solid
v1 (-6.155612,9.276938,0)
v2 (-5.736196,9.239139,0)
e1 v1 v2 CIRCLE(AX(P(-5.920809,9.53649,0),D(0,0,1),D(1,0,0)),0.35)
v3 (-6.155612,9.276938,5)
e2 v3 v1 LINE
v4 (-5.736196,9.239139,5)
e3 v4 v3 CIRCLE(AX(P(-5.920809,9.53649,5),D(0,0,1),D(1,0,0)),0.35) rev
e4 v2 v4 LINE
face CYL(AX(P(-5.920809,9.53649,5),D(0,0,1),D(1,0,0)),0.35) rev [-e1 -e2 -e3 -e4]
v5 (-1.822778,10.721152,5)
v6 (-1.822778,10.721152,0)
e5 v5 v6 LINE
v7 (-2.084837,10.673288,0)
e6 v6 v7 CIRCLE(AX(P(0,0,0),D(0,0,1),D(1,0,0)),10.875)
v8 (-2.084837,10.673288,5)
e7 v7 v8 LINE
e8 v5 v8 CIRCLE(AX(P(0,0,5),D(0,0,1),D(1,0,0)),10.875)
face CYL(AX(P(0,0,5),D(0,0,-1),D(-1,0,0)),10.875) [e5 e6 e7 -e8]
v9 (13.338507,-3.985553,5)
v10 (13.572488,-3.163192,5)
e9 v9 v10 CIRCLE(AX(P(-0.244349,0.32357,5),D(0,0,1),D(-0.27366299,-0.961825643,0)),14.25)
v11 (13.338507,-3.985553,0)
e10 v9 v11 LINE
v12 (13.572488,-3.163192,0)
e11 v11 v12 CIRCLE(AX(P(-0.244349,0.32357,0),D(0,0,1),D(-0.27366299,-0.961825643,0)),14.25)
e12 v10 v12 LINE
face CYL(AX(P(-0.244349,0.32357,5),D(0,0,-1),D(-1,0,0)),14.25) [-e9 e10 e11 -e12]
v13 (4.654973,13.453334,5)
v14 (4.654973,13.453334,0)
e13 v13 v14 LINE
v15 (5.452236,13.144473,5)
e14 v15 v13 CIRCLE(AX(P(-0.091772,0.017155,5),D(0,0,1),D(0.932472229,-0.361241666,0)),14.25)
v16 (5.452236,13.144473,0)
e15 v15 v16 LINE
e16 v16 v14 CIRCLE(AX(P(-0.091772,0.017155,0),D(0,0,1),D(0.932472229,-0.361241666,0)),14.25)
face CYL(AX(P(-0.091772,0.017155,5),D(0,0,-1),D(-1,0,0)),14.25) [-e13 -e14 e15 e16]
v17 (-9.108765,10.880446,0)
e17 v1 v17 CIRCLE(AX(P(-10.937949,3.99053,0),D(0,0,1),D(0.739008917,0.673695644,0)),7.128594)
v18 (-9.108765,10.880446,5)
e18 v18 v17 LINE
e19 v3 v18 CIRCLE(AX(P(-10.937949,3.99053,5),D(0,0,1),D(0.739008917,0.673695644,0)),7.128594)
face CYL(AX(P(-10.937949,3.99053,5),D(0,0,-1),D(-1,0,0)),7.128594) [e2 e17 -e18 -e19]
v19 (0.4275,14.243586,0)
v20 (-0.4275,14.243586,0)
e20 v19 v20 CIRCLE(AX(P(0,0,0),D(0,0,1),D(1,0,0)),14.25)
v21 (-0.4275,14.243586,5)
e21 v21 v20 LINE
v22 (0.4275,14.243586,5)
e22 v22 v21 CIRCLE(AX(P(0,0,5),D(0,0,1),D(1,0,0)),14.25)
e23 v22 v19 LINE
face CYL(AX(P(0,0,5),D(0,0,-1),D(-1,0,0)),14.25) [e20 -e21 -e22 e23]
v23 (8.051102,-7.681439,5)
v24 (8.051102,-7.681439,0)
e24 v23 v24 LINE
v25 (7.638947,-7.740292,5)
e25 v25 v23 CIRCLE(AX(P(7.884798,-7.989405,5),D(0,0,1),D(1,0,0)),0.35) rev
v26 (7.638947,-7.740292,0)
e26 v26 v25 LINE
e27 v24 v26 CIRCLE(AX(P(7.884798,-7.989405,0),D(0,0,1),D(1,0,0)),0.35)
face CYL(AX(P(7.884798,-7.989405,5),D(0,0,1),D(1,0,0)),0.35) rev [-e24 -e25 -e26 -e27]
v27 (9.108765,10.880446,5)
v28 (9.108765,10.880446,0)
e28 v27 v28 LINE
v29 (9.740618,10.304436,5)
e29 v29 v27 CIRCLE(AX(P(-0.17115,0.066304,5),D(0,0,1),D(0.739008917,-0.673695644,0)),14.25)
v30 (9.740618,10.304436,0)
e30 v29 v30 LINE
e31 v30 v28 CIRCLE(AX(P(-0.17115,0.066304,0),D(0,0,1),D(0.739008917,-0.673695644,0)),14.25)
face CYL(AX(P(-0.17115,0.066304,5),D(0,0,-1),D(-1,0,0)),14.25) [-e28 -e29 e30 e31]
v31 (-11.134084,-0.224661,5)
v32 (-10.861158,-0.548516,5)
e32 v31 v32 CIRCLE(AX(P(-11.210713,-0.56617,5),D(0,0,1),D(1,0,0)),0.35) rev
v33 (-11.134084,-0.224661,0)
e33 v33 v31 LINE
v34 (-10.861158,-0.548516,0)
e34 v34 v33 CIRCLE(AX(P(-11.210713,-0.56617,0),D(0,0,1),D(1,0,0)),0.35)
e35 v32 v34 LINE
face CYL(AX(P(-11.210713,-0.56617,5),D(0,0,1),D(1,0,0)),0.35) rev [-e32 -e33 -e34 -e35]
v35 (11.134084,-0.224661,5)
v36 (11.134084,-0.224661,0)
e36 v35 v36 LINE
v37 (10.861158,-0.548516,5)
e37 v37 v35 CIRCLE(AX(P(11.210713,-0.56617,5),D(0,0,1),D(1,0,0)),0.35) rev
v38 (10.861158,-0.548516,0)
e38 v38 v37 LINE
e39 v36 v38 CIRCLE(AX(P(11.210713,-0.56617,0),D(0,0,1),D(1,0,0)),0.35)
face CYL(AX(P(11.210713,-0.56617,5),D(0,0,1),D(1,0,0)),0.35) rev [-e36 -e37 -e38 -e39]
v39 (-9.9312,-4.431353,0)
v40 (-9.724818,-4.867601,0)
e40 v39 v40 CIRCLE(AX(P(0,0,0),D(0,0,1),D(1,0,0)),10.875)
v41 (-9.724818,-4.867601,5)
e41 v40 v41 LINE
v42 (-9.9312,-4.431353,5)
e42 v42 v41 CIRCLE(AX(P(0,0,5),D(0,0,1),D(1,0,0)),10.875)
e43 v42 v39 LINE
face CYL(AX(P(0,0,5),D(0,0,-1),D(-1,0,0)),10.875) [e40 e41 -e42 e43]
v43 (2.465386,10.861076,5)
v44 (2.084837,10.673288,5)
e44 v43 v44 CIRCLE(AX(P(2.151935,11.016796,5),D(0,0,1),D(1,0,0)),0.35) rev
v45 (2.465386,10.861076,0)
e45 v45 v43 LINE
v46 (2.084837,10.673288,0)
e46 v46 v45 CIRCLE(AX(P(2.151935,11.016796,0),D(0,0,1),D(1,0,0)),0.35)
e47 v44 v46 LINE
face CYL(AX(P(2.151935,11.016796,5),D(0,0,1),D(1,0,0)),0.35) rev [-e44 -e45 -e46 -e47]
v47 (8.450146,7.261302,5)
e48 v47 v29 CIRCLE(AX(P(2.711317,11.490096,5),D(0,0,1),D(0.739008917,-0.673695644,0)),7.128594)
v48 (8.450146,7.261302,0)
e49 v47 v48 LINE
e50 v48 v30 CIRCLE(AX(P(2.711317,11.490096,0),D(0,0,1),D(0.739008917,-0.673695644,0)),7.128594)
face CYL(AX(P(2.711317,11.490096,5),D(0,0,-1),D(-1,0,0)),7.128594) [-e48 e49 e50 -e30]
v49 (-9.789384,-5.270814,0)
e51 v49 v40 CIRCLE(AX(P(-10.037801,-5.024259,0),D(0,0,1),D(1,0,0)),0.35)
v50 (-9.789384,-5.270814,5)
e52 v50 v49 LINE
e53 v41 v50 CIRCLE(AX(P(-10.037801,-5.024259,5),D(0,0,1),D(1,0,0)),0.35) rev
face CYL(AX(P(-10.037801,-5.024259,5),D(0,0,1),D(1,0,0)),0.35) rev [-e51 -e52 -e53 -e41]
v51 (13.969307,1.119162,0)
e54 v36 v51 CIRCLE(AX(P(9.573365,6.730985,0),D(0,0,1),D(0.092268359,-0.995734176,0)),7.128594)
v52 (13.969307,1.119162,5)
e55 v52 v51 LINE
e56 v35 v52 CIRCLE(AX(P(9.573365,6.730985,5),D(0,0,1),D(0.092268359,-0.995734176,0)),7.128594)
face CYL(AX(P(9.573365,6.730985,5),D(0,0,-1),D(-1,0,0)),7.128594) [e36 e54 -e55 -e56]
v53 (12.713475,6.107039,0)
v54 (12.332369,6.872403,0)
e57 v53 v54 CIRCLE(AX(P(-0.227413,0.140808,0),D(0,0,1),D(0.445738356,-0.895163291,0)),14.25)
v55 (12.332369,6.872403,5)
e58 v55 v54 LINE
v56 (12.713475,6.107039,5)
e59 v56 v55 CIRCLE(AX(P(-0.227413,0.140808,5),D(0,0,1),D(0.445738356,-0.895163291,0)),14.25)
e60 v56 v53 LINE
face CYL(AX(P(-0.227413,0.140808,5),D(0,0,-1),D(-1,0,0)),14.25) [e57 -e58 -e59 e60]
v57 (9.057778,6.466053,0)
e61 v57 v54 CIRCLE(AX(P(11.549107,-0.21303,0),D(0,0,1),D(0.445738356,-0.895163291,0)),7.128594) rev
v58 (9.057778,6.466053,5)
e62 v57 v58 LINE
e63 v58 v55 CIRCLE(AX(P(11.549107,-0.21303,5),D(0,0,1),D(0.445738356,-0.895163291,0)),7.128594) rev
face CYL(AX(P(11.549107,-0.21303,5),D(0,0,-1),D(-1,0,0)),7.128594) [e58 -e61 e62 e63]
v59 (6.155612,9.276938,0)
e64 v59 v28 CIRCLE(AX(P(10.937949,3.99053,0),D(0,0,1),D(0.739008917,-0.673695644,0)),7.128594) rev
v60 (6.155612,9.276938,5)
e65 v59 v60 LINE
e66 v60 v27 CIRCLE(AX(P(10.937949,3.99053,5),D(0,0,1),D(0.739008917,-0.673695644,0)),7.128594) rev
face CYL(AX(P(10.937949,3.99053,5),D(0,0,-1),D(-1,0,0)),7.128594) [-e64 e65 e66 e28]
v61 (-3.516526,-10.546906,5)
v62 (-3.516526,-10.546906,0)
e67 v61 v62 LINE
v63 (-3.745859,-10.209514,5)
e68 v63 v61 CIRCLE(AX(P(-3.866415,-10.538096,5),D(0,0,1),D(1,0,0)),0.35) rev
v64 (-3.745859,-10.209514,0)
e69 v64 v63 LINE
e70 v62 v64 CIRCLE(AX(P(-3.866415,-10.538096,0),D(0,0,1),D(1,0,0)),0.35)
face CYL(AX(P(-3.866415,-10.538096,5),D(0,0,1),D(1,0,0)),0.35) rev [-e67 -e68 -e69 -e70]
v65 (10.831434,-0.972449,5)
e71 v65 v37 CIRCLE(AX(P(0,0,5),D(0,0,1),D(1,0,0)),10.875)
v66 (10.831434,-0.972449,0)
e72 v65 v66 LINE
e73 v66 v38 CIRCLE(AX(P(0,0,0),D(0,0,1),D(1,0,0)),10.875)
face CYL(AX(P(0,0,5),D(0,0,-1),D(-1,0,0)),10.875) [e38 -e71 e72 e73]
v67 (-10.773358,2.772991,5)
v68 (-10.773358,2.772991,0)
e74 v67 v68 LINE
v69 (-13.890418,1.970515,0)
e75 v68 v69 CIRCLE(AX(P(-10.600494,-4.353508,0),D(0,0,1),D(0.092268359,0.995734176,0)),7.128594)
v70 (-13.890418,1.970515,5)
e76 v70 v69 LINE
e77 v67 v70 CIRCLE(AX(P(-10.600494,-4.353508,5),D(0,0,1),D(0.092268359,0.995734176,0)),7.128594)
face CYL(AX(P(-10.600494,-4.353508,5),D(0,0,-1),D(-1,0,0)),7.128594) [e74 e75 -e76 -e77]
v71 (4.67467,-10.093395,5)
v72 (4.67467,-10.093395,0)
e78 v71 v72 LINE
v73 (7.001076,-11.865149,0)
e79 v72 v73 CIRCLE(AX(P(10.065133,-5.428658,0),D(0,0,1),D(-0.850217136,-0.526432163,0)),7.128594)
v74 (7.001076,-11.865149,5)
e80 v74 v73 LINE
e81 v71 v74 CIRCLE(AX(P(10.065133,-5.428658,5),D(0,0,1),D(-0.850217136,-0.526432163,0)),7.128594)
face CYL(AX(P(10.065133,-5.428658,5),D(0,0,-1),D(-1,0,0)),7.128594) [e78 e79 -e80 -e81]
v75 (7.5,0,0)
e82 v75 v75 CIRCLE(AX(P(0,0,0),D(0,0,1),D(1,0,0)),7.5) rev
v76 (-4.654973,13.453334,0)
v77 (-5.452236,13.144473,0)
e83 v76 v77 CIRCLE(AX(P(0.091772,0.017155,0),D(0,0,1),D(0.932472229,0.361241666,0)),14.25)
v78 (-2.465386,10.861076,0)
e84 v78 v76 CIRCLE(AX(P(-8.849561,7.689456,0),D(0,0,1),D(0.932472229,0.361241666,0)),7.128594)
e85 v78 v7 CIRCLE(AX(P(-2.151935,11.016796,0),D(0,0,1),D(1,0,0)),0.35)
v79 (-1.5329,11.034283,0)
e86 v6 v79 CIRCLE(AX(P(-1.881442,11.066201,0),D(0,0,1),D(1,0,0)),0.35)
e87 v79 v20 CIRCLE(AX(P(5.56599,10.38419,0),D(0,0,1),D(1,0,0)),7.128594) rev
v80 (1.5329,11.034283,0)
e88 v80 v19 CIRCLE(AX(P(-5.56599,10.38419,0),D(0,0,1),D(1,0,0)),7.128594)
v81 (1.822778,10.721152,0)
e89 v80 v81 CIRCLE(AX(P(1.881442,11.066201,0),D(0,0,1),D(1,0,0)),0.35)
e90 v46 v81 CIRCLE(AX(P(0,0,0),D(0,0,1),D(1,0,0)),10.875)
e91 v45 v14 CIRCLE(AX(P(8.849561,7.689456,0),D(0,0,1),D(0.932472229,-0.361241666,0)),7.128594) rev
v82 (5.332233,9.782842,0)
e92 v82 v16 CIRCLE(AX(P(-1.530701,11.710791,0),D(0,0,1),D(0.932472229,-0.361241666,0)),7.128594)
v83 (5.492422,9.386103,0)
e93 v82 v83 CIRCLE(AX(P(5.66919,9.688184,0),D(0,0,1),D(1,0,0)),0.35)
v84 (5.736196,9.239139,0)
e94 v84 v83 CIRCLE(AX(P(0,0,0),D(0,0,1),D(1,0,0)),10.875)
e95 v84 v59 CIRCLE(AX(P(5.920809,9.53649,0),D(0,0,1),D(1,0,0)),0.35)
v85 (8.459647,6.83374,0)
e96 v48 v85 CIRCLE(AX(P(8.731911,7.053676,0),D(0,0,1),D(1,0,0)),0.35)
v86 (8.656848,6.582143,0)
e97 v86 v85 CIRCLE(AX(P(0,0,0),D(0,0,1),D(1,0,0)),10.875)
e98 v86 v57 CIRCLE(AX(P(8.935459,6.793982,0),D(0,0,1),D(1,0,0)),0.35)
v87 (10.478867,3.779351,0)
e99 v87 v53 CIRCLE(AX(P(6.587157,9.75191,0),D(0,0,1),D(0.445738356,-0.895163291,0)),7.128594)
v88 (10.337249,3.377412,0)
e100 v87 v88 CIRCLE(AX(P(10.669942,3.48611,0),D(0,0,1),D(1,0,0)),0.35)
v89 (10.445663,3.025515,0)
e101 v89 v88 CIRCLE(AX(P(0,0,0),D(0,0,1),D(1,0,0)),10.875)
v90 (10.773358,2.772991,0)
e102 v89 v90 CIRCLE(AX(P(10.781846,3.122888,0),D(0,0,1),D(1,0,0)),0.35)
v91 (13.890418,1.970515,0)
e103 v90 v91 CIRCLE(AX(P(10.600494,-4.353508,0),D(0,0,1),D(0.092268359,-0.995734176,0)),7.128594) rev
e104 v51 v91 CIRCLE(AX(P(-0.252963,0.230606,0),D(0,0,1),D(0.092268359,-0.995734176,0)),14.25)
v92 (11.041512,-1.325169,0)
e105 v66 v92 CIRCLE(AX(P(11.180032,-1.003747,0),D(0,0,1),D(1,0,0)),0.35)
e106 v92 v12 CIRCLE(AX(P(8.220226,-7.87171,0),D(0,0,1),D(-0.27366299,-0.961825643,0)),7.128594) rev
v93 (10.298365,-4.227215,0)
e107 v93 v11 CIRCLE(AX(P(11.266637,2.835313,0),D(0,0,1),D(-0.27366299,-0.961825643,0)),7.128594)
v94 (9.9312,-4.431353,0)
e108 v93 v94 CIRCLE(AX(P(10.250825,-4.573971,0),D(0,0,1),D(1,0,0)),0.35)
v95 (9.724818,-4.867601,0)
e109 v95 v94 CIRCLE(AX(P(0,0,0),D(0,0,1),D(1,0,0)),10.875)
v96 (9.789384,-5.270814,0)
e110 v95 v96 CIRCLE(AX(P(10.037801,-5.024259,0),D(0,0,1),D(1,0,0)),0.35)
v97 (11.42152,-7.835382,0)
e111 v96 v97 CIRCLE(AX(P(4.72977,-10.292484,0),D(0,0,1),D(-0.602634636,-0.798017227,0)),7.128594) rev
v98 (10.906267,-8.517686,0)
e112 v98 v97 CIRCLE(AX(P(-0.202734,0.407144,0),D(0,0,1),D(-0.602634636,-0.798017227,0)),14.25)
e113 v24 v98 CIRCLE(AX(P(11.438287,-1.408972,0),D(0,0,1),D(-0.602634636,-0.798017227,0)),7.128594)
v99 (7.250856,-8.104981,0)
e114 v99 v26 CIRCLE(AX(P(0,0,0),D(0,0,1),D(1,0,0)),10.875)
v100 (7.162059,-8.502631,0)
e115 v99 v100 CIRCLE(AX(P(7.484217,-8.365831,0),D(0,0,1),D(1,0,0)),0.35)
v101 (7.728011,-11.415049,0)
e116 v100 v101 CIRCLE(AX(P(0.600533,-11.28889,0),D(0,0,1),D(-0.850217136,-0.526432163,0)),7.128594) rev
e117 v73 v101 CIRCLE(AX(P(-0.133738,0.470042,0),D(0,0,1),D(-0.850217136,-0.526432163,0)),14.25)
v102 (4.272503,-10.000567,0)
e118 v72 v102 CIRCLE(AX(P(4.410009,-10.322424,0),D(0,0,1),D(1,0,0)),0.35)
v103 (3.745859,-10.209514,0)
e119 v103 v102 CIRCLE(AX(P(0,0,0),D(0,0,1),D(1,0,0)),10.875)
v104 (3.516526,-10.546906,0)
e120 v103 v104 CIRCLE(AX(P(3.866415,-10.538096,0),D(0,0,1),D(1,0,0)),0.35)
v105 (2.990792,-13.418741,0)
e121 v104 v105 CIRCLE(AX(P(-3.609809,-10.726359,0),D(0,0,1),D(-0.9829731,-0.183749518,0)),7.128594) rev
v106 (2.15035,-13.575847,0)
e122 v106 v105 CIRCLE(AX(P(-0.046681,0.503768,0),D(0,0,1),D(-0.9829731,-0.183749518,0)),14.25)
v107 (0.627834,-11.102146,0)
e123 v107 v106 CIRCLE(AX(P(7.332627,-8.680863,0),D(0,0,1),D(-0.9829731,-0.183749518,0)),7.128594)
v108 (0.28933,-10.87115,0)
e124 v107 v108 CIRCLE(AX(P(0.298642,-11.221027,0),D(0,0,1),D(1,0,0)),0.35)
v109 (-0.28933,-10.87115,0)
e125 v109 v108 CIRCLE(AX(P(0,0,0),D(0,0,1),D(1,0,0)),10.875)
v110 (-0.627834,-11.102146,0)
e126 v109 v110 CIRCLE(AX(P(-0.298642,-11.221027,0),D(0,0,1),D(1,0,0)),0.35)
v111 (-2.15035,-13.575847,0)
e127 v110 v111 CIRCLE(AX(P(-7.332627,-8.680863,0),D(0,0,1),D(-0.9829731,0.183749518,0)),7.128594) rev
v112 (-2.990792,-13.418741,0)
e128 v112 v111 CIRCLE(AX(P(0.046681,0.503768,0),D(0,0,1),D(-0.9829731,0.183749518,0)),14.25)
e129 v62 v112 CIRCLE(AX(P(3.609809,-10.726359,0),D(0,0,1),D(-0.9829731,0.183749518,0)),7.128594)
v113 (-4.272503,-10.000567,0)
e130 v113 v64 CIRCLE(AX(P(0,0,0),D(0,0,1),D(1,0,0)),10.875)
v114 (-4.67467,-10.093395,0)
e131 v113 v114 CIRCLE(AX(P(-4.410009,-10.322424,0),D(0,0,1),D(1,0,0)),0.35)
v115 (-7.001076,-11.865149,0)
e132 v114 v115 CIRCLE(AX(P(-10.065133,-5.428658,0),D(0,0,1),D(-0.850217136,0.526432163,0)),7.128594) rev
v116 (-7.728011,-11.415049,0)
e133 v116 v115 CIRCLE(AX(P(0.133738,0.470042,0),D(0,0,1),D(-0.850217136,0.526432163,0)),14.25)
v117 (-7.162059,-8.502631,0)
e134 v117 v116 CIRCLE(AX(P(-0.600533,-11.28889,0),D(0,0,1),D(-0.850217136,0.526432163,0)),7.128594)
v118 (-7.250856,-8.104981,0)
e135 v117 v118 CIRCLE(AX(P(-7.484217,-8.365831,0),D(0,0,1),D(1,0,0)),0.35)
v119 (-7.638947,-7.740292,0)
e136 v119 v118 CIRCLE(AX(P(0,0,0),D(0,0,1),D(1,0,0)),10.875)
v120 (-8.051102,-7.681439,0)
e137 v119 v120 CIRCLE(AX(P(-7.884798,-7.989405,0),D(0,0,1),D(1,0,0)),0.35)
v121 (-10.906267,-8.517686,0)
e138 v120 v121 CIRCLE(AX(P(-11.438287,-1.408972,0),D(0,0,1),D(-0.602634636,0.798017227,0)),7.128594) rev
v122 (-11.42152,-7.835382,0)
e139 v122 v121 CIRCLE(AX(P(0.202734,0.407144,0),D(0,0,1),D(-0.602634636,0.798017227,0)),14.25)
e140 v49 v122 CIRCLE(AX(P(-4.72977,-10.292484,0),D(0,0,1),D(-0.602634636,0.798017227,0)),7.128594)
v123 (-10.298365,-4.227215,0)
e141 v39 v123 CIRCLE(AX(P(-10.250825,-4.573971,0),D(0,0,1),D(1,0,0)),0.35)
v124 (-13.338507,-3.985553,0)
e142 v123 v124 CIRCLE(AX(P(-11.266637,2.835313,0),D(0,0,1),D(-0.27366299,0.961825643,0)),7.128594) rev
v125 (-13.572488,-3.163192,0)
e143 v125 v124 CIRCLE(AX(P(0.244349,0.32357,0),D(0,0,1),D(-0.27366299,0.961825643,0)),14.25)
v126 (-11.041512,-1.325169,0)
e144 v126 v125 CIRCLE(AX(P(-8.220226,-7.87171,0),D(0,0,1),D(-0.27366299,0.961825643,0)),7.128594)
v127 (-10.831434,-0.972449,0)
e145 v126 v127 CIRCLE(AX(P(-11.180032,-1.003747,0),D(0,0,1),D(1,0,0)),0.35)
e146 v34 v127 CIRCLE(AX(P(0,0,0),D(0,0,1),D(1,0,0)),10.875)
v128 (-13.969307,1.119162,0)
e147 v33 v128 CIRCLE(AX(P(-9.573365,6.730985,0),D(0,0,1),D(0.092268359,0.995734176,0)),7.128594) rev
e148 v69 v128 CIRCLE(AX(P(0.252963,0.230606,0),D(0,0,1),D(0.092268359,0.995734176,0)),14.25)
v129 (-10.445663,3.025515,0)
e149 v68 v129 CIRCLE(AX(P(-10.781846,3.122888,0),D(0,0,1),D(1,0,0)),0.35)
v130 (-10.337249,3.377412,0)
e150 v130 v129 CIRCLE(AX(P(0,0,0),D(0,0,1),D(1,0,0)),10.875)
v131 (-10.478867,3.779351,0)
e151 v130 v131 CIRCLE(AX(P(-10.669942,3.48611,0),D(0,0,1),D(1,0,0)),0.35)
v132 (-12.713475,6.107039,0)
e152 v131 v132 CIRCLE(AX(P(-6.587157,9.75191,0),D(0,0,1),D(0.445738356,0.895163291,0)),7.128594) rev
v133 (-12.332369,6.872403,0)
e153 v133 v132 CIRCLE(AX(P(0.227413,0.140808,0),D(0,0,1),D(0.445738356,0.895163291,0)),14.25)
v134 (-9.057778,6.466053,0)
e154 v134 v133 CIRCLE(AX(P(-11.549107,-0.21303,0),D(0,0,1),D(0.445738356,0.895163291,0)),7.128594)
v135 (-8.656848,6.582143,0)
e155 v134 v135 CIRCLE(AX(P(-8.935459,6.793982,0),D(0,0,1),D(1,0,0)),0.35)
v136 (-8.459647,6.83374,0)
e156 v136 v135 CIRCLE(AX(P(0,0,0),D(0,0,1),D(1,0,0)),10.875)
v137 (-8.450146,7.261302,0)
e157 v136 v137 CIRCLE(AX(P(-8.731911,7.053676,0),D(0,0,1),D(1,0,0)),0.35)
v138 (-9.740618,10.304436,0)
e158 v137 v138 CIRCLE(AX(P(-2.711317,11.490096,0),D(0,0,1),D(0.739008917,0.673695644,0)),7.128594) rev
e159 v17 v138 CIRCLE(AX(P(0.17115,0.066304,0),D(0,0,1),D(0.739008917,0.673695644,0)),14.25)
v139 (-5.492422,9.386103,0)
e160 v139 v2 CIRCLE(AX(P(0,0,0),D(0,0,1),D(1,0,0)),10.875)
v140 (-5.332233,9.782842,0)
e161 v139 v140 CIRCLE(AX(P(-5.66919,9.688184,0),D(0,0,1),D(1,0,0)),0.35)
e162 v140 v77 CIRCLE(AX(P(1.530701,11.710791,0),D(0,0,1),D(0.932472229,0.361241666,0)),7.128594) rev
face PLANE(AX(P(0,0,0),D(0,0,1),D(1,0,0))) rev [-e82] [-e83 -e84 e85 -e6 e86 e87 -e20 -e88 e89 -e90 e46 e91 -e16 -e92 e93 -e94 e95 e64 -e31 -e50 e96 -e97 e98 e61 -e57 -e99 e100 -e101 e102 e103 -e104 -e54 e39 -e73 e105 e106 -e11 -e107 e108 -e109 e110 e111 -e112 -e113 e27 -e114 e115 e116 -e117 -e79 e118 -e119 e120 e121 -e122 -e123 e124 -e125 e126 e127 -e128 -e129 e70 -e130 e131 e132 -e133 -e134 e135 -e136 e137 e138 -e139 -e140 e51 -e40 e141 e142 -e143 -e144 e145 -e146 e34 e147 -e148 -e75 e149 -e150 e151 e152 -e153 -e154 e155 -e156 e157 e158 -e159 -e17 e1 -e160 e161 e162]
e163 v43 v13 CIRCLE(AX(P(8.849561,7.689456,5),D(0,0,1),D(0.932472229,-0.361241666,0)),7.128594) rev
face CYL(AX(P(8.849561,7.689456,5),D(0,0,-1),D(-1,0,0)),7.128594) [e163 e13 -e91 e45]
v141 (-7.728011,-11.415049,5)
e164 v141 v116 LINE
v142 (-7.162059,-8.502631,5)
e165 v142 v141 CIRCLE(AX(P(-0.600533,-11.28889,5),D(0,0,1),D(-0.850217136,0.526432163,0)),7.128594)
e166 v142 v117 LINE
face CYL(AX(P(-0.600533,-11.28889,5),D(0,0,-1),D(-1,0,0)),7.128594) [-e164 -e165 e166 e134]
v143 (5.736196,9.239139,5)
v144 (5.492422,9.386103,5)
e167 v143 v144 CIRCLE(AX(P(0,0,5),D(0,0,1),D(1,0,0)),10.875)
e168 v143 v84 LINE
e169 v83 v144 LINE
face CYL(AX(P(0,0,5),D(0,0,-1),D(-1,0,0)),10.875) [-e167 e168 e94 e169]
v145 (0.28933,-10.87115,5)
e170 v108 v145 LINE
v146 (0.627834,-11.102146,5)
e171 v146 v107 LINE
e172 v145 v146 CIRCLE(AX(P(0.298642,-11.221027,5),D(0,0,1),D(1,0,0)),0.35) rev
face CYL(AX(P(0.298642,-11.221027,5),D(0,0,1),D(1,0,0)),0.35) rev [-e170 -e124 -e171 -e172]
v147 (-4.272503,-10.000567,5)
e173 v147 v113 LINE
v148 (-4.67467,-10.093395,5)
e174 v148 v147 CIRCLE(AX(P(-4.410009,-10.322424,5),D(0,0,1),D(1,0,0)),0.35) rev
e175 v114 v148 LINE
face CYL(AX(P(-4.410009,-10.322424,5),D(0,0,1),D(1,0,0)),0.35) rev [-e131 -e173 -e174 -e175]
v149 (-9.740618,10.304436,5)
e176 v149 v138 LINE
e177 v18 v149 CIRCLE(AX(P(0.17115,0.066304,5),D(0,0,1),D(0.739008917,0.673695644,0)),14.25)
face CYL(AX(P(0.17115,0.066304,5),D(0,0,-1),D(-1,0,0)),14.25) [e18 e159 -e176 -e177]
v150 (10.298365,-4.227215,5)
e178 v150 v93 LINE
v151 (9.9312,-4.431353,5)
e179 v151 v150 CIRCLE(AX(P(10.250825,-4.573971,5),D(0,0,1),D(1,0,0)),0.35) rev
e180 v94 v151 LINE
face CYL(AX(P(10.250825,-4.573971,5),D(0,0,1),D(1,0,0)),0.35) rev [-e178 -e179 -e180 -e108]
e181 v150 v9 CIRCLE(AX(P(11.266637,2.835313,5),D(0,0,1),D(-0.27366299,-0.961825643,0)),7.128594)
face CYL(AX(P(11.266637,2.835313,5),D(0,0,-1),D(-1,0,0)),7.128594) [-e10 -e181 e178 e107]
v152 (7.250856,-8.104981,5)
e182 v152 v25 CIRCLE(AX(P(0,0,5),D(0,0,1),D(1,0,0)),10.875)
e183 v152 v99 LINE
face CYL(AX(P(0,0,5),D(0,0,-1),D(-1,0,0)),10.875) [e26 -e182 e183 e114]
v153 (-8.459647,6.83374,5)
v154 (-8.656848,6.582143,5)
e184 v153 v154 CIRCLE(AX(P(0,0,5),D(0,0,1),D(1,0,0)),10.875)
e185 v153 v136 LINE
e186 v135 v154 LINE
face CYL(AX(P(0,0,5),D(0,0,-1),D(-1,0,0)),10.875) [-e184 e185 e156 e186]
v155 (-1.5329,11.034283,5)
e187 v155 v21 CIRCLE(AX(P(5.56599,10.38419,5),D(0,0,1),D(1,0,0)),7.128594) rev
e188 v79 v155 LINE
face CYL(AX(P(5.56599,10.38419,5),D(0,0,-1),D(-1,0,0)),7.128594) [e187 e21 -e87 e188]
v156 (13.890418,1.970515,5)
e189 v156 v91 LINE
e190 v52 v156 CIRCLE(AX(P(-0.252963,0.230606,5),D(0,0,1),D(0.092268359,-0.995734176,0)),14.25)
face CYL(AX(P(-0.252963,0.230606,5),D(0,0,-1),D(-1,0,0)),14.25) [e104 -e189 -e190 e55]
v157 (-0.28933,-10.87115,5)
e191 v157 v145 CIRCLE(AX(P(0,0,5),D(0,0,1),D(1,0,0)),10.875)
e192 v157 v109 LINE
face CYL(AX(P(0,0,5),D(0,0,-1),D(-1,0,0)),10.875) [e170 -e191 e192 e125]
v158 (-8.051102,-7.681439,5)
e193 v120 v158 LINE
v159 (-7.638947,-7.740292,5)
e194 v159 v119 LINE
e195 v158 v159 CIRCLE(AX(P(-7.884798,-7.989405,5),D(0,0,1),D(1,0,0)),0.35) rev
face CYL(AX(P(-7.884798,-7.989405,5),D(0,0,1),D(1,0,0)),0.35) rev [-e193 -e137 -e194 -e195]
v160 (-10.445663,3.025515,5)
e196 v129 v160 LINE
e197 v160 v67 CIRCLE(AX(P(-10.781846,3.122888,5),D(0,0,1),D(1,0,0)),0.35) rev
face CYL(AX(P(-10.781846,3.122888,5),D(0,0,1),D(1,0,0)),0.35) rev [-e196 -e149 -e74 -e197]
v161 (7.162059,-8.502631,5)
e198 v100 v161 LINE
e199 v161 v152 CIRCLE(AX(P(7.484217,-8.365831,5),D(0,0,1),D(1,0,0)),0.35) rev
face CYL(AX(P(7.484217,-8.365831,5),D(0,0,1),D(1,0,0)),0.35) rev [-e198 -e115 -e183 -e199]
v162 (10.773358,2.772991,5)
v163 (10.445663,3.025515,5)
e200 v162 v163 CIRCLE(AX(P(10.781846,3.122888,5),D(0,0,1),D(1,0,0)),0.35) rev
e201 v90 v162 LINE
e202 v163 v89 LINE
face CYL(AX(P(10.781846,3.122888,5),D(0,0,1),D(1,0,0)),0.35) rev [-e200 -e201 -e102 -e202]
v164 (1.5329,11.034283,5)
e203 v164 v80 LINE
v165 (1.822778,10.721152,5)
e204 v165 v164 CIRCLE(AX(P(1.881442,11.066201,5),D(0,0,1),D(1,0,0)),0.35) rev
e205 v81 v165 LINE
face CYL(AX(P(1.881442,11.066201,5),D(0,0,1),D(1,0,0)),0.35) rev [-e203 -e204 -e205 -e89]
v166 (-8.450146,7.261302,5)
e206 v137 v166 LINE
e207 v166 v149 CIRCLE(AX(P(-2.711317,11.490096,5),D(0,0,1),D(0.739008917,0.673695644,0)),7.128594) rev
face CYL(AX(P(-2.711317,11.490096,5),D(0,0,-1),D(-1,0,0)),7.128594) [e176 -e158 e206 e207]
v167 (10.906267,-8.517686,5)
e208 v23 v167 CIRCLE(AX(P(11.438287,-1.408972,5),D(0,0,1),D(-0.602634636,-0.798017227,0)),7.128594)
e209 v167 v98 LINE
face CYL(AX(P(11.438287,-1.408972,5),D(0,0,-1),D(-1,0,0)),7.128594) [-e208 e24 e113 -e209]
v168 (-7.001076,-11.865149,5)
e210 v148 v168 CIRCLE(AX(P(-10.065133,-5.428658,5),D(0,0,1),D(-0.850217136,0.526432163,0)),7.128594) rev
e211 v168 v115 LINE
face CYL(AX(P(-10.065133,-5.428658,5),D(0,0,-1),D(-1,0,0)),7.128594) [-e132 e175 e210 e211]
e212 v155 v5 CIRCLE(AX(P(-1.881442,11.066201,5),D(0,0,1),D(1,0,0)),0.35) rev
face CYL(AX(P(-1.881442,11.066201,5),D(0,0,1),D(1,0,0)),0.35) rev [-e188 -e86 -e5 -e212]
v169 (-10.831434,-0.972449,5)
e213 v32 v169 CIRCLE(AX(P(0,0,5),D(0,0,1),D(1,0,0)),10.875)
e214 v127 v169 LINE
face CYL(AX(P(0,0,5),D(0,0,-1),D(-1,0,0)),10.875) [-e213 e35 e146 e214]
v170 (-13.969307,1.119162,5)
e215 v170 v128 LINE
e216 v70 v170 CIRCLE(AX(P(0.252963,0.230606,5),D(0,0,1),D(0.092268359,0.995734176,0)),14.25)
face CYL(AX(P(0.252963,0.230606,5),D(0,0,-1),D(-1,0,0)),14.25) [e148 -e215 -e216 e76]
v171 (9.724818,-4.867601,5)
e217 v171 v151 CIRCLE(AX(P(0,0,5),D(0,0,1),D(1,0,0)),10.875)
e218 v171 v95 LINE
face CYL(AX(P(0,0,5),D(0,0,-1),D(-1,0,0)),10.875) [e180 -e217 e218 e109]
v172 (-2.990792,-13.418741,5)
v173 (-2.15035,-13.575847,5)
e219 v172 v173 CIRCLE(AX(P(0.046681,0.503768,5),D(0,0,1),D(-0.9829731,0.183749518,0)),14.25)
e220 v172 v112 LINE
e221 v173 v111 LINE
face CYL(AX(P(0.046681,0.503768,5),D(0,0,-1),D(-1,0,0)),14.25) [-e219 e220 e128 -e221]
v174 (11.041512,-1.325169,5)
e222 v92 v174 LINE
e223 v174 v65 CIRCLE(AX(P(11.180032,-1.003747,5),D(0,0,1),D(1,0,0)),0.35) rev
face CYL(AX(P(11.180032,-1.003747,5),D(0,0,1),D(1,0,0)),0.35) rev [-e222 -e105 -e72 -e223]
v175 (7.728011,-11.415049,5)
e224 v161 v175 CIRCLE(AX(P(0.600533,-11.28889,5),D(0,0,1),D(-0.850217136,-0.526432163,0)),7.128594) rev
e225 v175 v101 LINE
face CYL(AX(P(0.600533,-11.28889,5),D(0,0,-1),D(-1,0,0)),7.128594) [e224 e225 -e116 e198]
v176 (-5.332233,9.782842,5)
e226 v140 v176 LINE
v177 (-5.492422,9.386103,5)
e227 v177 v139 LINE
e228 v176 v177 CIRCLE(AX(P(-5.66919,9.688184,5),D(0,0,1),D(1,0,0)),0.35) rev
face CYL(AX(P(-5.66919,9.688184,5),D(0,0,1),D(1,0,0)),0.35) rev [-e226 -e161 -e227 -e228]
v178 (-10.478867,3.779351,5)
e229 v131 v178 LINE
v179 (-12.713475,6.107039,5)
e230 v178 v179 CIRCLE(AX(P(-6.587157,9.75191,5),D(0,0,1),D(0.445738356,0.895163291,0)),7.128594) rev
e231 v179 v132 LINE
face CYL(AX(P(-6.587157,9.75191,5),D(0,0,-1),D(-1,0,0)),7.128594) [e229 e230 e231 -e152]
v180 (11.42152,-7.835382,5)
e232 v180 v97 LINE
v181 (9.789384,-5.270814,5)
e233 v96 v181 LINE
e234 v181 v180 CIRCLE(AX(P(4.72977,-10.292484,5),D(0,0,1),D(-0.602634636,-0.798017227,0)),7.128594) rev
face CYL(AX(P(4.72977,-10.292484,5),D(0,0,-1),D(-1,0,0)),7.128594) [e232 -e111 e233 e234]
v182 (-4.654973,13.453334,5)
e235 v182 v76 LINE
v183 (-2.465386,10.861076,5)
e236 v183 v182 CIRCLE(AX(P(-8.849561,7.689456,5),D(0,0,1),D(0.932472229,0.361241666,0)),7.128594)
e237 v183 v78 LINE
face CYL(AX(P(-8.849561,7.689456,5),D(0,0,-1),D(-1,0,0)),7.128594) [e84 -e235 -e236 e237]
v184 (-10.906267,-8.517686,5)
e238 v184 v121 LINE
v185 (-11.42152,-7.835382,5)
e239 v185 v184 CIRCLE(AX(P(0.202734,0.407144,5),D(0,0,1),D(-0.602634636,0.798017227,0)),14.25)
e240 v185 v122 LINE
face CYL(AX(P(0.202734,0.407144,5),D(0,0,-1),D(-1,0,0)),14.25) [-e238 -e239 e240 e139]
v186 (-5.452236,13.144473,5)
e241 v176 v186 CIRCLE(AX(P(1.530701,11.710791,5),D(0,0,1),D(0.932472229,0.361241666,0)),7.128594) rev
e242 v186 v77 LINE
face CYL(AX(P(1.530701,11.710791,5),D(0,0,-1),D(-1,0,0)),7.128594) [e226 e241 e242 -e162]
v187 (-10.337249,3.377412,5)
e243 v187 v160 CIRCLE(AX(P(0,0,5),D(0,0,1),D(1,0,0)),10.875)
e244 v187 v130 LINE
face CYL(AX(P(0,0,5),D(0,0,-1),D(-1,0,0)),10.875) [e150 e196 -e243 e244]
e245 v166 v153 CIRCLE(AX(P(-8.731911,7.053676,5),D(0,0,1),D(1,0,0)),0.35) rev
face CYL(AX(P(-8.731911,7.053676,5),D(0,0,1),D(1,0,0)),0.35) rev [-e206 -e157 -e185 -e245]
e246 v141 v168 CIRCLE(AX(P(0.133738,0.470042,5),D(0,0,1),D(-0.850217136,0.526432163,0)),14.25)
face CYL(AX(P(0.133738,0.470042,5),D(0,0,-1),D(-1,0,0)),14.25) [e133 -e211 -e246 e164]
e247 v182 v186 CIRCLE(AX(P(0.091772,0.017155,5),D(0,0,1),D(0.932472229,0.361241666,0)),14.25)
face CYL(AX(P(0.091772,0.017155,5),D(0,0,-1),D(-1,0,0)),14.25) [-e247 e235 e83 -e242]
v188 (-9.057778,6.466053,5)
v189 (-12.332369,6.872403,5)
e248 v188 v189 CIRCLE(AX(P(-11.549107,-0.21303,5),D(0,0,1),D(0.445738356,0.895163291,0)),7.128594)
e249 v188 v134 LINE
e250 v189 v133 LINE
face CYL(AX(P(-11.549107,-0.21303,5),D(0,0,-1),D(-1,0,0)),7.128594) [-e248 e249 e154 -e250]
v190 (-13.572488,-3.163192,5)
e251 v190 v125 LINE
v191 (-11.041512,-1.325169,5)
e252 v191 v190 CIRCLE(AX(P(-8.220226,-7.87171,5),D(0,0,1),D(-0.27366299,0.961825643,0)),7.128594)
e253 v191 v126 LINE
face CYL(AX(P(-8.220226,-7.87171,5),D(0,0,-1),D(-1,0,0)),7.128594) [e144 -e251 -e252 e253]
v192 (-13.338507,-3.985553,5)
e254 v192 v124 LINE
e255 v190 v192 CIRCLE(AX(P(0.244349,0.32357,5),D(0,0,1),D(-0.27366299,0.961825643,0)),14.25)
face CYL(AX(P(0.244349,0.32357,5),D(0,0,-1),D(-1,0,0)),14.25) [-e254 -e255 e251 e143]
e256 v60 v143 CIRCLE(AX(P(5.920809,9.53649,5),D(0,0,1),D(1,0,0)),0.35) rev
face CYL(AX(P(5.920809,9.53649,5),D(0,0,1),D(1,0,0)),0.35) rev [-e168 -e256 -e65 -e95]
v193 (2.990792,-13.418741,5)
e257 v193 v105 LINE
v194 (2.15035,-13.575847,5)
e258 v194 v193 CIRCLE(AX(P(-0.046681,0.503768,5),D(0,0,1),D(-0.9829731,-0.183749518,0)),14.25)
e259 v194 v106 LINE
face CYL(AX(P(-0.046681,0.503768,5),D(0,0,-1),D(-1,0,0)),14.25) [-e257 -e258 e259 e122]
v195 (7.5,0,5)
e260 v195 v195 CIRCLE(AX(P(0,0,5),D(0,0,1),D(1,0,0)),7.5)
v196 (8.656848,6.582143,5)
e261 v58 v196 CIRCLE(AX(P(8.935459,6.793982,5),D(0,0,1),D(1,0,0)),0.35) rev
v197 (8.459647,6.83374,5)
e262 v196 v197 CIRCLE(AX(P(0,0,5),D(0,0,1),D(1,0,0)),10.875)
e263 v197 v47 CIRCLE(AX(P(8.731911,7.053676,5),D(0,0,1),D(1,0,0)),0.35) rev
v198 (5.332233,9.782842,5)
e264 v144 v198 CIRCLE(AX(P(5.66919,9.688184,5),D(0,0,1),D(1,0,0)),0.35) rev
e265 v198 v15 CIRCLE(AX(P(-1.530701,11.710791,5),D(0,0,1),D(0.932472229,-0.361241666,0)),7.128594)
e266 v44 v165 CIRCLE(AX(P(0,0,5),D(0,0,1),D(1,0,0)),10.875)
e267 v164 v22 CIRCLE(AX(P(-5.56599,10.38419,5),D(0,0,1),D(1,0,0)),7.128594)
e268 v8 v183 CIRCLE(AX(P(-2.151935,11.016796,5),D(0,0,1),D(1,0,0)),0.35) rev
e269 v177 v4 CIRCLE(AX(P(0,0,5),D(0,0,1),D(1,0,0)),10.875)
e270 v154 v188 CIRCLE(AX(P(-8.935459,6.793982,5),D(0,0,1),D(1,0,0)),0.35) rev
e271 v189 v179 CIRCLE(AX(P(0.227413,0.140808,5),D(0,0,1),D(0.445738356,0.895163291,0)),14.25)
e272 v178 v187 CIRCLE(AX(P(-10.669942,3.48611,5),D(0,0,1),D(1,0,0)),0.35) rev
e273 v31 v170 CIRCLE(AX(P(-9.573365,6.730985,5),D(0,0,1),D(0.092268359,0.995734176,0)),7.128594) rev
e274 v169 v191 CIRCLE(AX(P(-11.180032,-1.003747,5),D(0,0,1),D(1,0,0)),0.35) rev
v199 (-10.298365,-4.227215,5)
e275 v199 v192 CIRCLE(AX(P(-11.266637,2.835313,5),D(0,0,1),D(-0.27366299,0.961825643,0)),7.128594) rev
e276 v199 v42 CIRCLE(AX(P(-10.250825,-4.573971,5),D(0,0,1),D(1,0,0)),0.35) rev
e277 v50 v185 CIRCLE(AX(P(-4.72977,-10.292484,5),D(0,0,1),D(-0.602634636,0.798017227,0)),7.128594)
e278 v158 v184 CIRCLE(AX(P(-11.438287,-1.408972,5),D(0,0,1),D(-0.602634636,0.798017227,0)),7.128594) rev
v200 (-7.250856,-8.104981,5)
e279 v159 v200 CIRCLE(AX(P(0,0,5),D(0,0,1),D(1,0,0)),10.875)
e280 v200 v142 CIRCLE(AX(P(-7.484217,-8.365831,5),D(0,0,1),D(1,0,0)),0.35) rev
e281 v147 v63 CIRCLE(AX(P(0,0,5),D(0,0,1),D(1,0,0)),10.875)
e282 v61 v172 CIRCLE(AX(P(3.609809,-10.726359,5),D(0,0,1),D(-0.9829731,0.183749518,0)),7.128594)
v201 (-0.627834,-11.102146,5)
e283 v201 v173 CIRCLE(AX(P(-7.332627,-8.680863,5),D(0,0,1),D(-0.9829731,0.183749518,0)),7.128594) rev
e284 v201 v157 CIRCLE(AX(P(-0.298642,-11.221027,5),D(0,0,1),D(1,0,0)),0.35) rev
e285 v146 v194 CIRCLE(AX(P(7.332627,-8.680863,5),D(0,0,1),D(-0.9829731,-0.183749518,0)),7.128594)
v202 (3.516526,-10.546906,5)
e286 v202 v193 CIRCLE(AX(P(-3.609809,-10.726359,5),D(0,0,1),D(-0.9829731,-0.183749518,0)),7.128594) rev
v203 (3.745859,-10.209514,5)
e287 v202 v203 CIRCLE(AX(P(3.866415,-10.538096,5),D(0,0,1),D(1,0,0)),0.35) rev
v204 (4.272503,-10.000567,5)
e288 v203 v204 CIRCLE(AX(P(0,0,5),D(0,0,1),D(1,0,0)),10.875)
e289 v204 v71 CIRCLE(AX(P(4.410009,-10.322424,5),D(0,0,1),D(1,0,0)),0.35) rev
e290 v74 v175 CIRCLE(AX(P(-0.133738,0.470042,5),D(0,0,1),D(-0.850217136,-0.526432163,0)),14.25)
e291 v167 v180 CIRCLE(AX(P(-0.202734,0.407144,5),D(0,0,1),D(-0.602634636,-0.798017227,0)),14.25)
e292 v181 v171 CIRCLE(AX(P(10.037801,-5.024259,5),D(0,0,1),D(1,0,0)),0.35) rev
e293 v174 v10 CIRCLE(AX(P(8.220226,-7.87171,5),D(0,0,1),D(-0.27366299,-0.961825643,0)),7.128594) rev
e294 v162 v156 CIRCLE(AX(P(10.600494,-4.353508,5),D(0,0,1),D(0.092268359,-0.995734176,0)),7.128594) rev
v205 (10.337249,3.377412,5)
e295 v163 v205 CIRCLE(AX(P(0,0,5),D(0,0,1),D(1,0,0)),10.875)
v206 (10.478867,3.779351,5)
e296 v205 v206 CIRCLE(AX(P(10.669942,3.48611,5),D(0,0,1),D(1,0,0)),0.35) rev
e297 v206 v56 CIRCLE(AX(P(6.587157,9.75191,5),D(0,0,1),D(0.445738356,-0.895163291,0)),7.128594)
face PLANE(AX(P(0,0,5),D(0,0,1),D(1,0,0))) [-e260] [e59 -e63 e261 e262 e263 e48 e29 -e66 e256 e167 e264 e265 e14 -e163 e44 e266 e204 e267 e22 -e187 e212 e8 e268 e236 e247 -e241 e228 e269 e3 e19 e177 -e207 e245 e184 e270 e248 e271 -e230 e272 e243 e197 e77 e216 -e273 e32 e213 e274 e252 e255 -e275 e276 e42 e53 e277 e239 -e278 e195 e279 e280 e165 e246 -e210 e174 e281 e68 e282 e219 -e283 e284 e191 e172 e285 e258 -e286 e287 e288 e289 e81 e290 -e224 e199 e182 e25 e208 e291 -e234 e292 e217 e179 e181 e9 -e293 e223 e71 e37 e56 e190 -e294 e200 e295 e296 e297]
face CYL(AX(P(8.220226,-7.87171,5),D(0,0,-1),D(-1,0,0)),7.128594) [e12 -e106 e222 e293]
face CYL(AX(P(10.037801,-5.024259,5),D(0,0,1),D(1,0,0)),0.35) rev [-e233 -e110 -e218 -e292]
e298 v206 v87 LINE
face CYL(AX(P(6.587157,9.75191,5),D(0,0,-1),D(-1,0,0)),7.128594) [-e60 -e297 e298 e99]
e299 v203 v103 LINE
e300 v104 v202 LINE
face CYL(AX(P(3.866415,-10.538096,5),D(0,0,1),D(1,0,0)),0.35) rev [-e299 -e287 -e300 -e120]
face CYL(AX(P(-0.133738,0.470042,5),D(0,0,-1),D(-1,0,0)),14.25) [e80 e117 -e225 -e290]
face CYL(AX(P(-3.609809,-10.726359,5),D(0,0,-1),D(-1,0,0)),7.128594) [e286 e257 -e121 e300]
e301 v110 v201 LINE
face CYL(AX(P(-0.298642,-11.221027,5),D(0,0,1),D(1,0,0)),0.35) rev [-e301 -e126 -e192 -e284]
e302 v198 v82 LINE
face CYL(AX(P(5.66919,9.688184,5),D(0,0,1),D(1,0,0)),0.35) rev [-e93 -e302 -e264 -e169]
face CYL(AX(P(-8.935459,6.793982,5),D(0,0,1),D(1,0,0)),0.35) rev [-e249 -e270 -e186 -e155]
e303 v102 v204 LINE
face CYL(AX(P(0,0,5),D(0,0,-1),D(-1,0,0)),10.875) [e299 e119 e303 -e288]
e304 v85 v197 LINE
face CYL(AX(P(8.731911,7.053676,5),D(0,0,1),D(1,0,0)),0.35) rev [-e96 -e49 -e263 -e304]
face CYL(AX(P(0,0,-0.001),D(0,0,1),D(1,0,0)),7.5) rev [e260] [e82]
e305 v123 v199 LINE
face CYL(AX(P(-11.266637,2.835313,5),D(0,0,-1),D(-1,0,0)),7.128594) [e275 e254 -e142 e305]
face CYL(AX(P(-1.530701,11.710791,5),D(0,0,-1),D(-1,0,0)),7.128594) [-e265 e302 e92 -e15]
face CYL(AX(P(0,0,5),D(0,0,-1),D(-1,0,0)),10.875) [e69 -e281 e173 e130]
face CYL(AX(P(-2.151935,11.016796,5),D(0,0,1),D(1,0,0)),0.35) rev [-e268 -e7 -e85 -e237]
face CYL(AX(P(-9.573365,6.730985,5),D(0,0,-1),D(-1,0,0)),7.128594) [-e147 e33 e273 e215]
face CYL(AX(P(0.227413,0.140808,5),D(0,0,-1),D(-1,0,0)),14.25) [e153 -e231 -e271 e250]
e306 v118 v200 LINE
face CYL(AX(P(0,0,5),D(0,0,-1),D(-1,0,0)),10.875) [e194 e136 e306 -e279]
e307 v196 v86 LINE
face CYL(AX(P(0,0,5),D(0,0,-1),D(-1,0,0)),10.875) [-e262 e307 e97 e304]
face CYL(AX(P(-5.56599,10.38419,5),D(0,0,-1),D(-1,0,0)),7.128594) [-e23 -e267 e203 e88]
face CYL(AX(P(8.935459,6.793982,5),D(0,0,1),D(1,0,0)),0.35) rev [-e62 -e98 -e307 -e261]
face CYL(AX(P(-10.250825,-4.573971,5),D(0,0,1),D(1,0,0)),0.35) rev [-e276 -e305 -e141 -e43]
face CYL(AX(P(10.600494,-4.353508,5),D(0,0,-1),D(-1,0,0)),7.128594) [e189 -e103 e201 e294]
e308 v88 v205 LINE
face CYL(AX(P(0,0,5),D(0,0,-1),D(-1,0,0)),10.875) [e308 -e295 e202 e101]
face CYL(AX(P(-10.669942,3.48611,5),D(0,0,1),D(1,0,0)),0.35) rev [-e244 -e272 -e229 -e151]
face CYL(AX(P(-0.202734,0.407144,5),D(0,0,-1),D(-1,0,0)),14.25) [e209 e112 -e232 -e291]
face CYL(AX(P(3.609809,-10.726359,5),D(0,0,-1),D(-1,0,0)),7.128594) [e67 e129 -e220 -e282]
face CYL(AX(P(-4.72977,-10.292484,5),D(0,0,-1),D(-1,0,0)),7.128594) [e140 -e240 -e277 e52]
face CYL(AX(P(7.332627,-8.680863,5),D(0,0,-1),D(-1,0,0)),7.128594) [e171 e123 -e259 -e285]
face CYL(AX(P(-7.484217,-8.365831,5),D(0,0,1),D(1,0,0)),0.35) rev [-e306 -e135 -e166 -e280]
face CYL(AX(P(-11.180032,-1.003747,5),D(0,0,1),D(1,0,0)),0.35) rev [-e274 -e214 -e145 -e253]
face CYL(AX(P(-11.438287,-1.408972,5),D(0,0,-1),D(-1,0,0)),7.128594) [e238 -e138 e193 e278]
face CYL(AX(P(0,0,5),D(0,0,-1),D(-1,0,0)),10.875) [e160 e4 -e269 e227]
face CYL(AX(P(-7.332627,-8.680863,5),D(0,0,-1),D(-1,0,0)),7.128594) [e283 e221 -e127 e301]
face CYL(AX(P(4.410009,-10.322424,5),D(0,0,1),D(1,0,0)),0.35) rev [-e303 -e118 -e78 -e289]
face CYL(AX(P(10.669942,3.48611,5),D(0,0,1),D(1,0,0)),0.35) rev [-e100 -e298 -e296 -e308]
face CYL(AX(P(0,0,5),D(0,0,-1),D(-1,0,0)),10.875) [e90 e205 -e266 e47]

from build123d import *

# Parameters (mm, degrees)
SKETCH_1_R               = 10.875
EXTRUDE_1_DEPTH          = 5
EXTRUDE_2_DEPTH          = 5
FILLET_1_R               = 0.35
PATTERN_CIRCULAR_1_DEPTH = 5
CUT_EXTRUDE_1_REACH      = 22.572
SKETCH_2_R               = 7.5


# Read off the part's stored shape, not the designer's step: 원형 패턴1
with BuildPart() as part:
    # 스케치1 → 보스-돌출1 (new body)
    with BuildSketch(Plane.XY):
        Circle(SKETCH_1_R)
    extrude(amount=EXTRUDE_1_DEPTH)

    # 스케치1<3> → 보스-돌출2 (add)
    with BuildSketch(Plane.XY):
        with BuildLine():
            ThreePointArc((1.5525, 10.763613183), (1.216970842, 12.576974386), (0.4275, 14.243586057))
            ThreePointArc((0.4275, 14.243586057), (0, 14.25), (-0.4275, 14.243586057))
            ThreePointArc((-0.4275, 14.243586057), (-1.216970842, 12.576974386), (-1.5525, 10.763613183))
            ThreePointArc((-1.5525, 10.763613183), (0, 10.875), (1.5525, 10.763613183))
        make_face()
    extrude(amount=EXTRUDE_2_DEPTH)

    # 필렛1
    fillet_1_edges = [part.edges().sort_by_distance(p)[0] for p in [
        (-1.5525, 10.763613183, 2.5),
        (1.5525, 10.763613183, 2.5),
    ]]
    fillet(fillet_1_edges, radius=FILLET_1_R)

    # 원형 패턴1 outline → 원형 패턴1 (add)
    with BuildSketch(Plane.XY):
        with BuildLine():
            ThreePointArc((2.084837088, 10.673288121), (3.842906104, 10.173381821), (5.492422476, 9.386102511))
            ThreePointArc((5.492422476, 9.386102511), (5.344646109, 9.557145045), (5.332233471, 9.782842475))
            ThreePointArc((5.332233471, 9.782842475), (5.593355494, 11.4564781), (5.452236305, 13.144472855))
            ThreePointArc((5.452236305, 13.144472855), (5.055921411, 13.304884491), (4.654972549, 13.453334479))
            ThreePointArc((4.654972549, 13.453334479), (3.403689946, 12.289385973), (2.465385752, 10.861075951))
            ThreePointArc((2.465385752, 10.861075951), (2.306817266, 10.702930709), (2.084837088, 10.673288121))
        make_face()
        with BuildLine():
            ThreePointArc((5.736195698, 9.2391387), (7.199095251, 8.150990895), (8.459646862, 6.833739823))
            ThreePointArc((8.459646862, 6.833739823), (8.381997736, 7.045900933), (8.450146114, 7.261301773))
            ThreePointArc((8.450146114, 7.261301773), (9.274201483, 8.707038787), (9.740617886, 10.304436202))
            ThreePointArc((9.740617886, 10.304436202), (9.42901262, 10.597181051), (9.108765262, 10.880445977))
            ThreePointArc((9.108765262, 10.880445977), (7.536352291, 10.255192371), (6.155612256, 9.27693802))
            ThreePointArc((6.155612256, 9.27693802), (5.952224819, 9.187903085), (5.736195698, 9.2391387))
        make_face()
        with BuildLine():
            ThreePointArc((8.656847778, 6.582143386), (9.631277253, 5.050160738), (10.337248772, 3.377412148))
            ThreePointArc((10.337248772, 3.377412148), (10.339832595, 3.602419922), (10.478866532, 3.779351375))
            ThreePointArc((10.478866532, 3.779351375), (11.729603042, 4.815098477), (12.713475046, 6.107038785))
            ThreePointArc((12.713475046, 6.107038785), (12.528663426, 6.492580033), (12.332368752, 6.872403399))
            ThreePointArc((12.332368752, 6.872403399), (10.671238348, 6.86130469), (9.057778331, 6.466052652))
            ThreePointArc((9.057778331, 6.466052652), (8.838113972, 6.457792134), (8.656847778, 6.582143386))
        make_face()
        with BuildLine():
            ThreePointArc((10.44566348, 3.025514743), (10.802249116, 1.255802147), (10.861158072, -0.548516485))
            ThreePointArc((10.861158072, -0.548516485), (10.943077602, -0.34062274), (11.134084318, -0.224661311))
            ThreePointArc((11.134084318, -0.224661311), (12.626546762, 0.289328326), (13.969306954, 1.119162384))
            ThreePointArc((13.969306954, 1.119162384), (13.936248813, 1.545430549), (13.890417506, 1.970515105))
            ThreePointArc((13.890417506, 1.970515105), (12.377771936, 2.549980076), (10.773358461, 2.772990553))
            ThreePointArc((10.773358461, 2.772990553), (10.568207288, 2.845653785), (10.44566348, 3.025514743))
        make_face()
        with BuildLine():
            ThreePointArc((10.831434222, -0.972449329), (10.524388312, -2.739137757), (9.931200049, -4.431353133))
            ThreePointArc((9.931200049, -4.431353133), (10.080749628, -4.26807205), (10.298365111, -4.227215102))
            ThreePointArc((10.298365111, -4.227215102), (11.831510548, -4.270865326), (13.338506551, -3.985552654))
            ThreePointArc((13.338506551, -3.985552654), (13.461666574, -3.57612745), (13.572488407, -3.163191729))
            ThreePointArc((13.572488407, -3.163191729), (12.409057254, -2.103647039), (11.041512467, -1.325168872))
            ThreePointArc((11.041512467, -1.325168872), (10.879326869, -1.182845296), (10.831434222, -0.972449329))
        make_face()
        with BuildLine():
            ThreePointArc((9.724818044, -4.867600951), (8.799895988, -6.389636578), (7.638946645, -7.74029193))
            ThreePointArc((7.638946645, -7.74029193), (7.835322049, -7.642919348), (8.051101932, -7.68143897))
            ThreePointArc((8.051101932, -7.68143897), (9.434573038, -8.250170344), (10.906266927, -8.517686277))
            ThreePointArc((10.906266927, -8.517686277), (11.169011671, -8.180399177), (11.421519541, -7.835381548))
            ThreePointArc((11.421519541, -7.835381548), (10.743744256, -6.465085659), (9.78938361, -5.27081353))
            ThreePointArc((9.78938361, -5.27081353), (9.692203368, -5.079599132), (9.724818044, -4.867600951))
        make_face()
        with BuildLine():
            ThreePointArc((7.250855805, -8.104980882), (5.839114845, -9.174440736), (4.272503154, -10.000567074))
            ThreePointArc((4.272503154, -10.000567074), (4.488726043, -9.981391229), (4.674670149, -10.09339498))
            ThreePointArc((4.674670149, -10.09339498), (5.746046713, -11.099844355), (7.00107552, -11.865148727))
            ThreePointArc((7.00107552, -11.865148727), (7.367919852, -11.645552222), (7.728011172, -11.415049228))
            ThreePointArc((7.728011172, -11.415049228), (7.598229184, -9.929070664), (7.162058655, -8.502630716))
            ThreePointArc((7.162058655, -8.502630716), (7.142629708, -8.289552802), (7.250855805, -8.104980882))
        make_face()
        with BuildLine():
            ThreePointArc((3.745858716, -10.209513577), (2.04453627, -10.681081239), (0.289330355, -10.871150489))
            ThreePointArc((0.289330355, -10.871150489), (0.495925275, -10.93192564), (0.627834307, -11.102146342))
            ThreePointArc((0.627834307, -11.102146342), (1.261761796, -12.417365945), (2.150350071, -13.57584665))
            ThreePointArc((2.150350071, -13.57584665), (2.57174963, -13.503598465), (2.990792071, -13.418740812))
            ThreePointArc((2.990792071, -13.418740812), (3.40225572, -12.010026536), (3.516526006, -10.546906395))
            ThreePointArc((3.516526006, -10.546906395), (3.576953157, -10.341342504), (3.745858716, -10.209513577))
        make_face()
        with BuildLine():
            ThreePointArc((-0.289330355, -10.871150489), (-2.04453627, -10.681081239), (-3.745858716, -10.209513577))
            ThreePointArc((-3.745858716, -10.209513577), (-3.576953157, -10.341342504), (-3.516526006, -10.546906395))
            ThreePointArc((-3.516526006, -10.546906395), (-3.40225572, -12.010026536), (-2.990792071, -13.418740812))
            ThreePointArc((-2.990792071, -13.418740812), (-2.57174963, -13.503598465), (-2.150350071, -13.57584665))
            ThreePointArc((-2.150350071, -13.57584665), (-1.261761796, -12.417365945), (-0.627834307, -11.102146342))
            ThreePointArc((-0.627834307, -11.102146342), (-0.495925275, -10.93192564), (-0.289330355, -10.871150489))
        make_face()
        with BuildLine():
            ThreePointArc((-4.272503154, -10.000567074), (-5.839114845, -9.174440736), (-7.250855805, -8.104980882))
            ThreePointArc((-7.250855805, -8.104980882), (-7.142629708, -8.289552802), (-7.162058655, -8.502630716))
            ThreePointArc((-7.162058655, -8.502630716), (-7.598229184, -9.929070664), (-7.728011172, -11.415049228))
            ThreePointArc((-7.728011172, -11.415049228), (-7.367919852, -11.645552222), (-7.00107552, -11.865148727))
            ThreePointArc((-7.00107552, -11.865148727), (-5.746046713, -11.099844355), (-4.674670149, -10.09339498))
            ThreePointArc((-4.674670149, -10.09339498), (-4.488726043, -9.981391229), (-4.272503154, -10.000567074))
        make_face()
        with BuildLine():
            ThreePointArc((-7.638946645, -7.74029193), (-8.799895988, -6.389636578), (-9.724818044, -4.867600951))
            ThreePointArc((-9.724818044, -4.867600951), (-9.692203368, -5.079599132), (-9.78938361, -5.27081353))
            ThreePointArc((-9.78938361, -5.27081353), (-10.743744256, -6.465085659), (-11.421519541, -7.835381548))
            ThreePointArc((-11.421519541, -7.835381548), (-11.169011671, -8.180399177), (-10.906266927, -8.517686277))
            ThreePointArc((-10.906266927, -8.517686277), (-9.434573038, -8.250170344), (-8.051101932, -7.68143897))
            ThreePointArc((-8.051101932, -7.68143897), (-7.835322049, -7.642919348), (-7.638946645, -7.74029193))
        make_face()
        with BuildLine():
            ThreePointArc((-9.931200049, -4.431353133), (-10.524388312, -2.739137757), (-10.831434222, -0.972449329))
            ThreePointArc((-10.831434222, -0.972449329), (-10.879326869, -1.182845296), (-11.041512467, -1.325168872))
            ThreePointArc((-11.041512467, -1.325168872), (-12.409057254, -2.103647039), (-13.572488407, -3.163191729))
            ThreePointArc((-13.572488407, -3.163191729), (-13.461666574, -3.57612745), (-13.338506551, -3.985552654))
            ThreePointArc((-13.338506551, -3.985552654), (-11.831510548, -4.270865326), (-10.298365111, -4.227215102))
            ThreePointArc((-10.298365111, -4.227215102), (-10.080749628, -4.26807205), (-9.931200049, -4.431353133))
        make_face()
        with BuildLine():
            ThreePointArc((-10.861158072, -0.548516485), (-10.802249116, 1.255802147), (-10.44566348, 3.025514743))
            ThreePointArc((-10.44566348, 3.025514743), (-10.568207288, 2.845653785), (-10.773358461, 2.772990553))
            ThreePointArc((-10.773358461, 2.772990553), (-12.377771936, 2.549980076), (-13.890417506, 1.970515105))
            ThreePointArc((-13.890417506, 1.970515105), (-13.936248813, 1.545430549), (-13.969306954, 1.119162384))
            ThreePointArc((-13.969306954, 1.119162384), (-12.626546762, 0.289328326), (-11.134084318, -0.224661311))
            ThreePointArc((-11.134084318, -0.224661311), (-10.943077602, -0.34062274), (-10.861158072, -0.548516485))
        make_face()
        with BuildLine():
            ThreePointArc((-10.337248772, 3.377412148), (-9.631277253, 5.050160738), (-8.656847778, 6.582143386))
            ThreePointArc((-8.656847778, 6.582143386), (-8.838113972, 6.457792134), (-9.057778331, 6.466052652))
            ThreePointArc((-9.057778331, 6.466052652), (-10.671238348, 6.86130469), (-12.332368752, 6.872403399))
            ThreePointArc((-12.332368752, 6.872403399), (-12.528663426, 6.492580033), (-12.713475046, 6.107038785))
            ThreePointArc((-12.713475046, 6.107038785), (-11.729603042, 4.815098477), (-10.478866532, 3.779351375))
            ThreePointArc((-10.478866532, 3.779351375), (-10.339832595, 3.602419922), (-10.337248772, 3.377412148))
        make_face()
        with BuildLine():
            ThreePointArc((-8.459646862, 6.833739823), (-7.199095251, 8.150990895), (-5.736195698, 9.2391387))
            ThreePointArc((-5.736195698, 9.2391387), (-5.952224819, 9.187903085), (-6.155612256, 9.27693802))
            ThreePointArc((-6.155612256, 9.27693802), (-7.536352291, 10.255192371), (-9.108765262, 10.880445977))
            ThreePointArc((-9.108765262, 10.880445977), (-9.42901262, 10.597181051), (-9.740617886, 10.304436202))
            ThreePointArc((-9.740617886, 10.304436202), (-9.274201483, 8.707038787), (-8.450146114, 7.261301773))
            ThreePointArc((-8.450146114, 7.261301773), (-8.381997736, 7.045900933), (-8.459646862, 6.833739823))
        make_face()
        with BuildLine():
            ThreePointArc((-2.465385752, 10.861075951), (-3.403689946, 12.289385973), (-4.654972549, 13.453334479))
            ThreePointArc((-4.654972549, 13.453334479), (-5.055921411, 13.304884491), (-5.452236305, 13.144472855))
            ThreePointArc((-5.452236305, 13.144472855), (-5.593355494, 11.4564781), (-5.332233471, 9.782842475))
            ThreePointArc((-5.332233471, 9.782842475), (-5.344646109, 9.557145045), (-5.492422476, 9.386102511))
            ThreePointArc((-5.492422476, 9.386102511), (-3.842906104, 10.173381821), (-2.084837088, 10.673288121))
            ThreePointArc((-2.084837088, 10.673288121), (-2.306817266, 10.702930709), (-2.465385752, 10.861075951))
        make_face()
    extrude(amount=PATTERN_CIRCULAR_1_DEPTH)

    # 스케치2 → 컷-돌출1 (cut, up to next)
    with BuildSketch(Plane.XY.offset(5), mode=Mode.PRIVATE) as cut_extrude_1_sk1:
        Circle(SKETCH_2_R)
    cut_extrude_1_tool1 = extrude(cut_extrude_1_sk1.sketch, amount=-CUT_EXTRUDE_1_REACH, mode=Mode.PRIVATE) & part.part
    add(cut_extrude_1_tool1.solids().sort_by_distance((0, 0, 5))[0], mode=Mode.SUBTRACT)


solid = part.part
